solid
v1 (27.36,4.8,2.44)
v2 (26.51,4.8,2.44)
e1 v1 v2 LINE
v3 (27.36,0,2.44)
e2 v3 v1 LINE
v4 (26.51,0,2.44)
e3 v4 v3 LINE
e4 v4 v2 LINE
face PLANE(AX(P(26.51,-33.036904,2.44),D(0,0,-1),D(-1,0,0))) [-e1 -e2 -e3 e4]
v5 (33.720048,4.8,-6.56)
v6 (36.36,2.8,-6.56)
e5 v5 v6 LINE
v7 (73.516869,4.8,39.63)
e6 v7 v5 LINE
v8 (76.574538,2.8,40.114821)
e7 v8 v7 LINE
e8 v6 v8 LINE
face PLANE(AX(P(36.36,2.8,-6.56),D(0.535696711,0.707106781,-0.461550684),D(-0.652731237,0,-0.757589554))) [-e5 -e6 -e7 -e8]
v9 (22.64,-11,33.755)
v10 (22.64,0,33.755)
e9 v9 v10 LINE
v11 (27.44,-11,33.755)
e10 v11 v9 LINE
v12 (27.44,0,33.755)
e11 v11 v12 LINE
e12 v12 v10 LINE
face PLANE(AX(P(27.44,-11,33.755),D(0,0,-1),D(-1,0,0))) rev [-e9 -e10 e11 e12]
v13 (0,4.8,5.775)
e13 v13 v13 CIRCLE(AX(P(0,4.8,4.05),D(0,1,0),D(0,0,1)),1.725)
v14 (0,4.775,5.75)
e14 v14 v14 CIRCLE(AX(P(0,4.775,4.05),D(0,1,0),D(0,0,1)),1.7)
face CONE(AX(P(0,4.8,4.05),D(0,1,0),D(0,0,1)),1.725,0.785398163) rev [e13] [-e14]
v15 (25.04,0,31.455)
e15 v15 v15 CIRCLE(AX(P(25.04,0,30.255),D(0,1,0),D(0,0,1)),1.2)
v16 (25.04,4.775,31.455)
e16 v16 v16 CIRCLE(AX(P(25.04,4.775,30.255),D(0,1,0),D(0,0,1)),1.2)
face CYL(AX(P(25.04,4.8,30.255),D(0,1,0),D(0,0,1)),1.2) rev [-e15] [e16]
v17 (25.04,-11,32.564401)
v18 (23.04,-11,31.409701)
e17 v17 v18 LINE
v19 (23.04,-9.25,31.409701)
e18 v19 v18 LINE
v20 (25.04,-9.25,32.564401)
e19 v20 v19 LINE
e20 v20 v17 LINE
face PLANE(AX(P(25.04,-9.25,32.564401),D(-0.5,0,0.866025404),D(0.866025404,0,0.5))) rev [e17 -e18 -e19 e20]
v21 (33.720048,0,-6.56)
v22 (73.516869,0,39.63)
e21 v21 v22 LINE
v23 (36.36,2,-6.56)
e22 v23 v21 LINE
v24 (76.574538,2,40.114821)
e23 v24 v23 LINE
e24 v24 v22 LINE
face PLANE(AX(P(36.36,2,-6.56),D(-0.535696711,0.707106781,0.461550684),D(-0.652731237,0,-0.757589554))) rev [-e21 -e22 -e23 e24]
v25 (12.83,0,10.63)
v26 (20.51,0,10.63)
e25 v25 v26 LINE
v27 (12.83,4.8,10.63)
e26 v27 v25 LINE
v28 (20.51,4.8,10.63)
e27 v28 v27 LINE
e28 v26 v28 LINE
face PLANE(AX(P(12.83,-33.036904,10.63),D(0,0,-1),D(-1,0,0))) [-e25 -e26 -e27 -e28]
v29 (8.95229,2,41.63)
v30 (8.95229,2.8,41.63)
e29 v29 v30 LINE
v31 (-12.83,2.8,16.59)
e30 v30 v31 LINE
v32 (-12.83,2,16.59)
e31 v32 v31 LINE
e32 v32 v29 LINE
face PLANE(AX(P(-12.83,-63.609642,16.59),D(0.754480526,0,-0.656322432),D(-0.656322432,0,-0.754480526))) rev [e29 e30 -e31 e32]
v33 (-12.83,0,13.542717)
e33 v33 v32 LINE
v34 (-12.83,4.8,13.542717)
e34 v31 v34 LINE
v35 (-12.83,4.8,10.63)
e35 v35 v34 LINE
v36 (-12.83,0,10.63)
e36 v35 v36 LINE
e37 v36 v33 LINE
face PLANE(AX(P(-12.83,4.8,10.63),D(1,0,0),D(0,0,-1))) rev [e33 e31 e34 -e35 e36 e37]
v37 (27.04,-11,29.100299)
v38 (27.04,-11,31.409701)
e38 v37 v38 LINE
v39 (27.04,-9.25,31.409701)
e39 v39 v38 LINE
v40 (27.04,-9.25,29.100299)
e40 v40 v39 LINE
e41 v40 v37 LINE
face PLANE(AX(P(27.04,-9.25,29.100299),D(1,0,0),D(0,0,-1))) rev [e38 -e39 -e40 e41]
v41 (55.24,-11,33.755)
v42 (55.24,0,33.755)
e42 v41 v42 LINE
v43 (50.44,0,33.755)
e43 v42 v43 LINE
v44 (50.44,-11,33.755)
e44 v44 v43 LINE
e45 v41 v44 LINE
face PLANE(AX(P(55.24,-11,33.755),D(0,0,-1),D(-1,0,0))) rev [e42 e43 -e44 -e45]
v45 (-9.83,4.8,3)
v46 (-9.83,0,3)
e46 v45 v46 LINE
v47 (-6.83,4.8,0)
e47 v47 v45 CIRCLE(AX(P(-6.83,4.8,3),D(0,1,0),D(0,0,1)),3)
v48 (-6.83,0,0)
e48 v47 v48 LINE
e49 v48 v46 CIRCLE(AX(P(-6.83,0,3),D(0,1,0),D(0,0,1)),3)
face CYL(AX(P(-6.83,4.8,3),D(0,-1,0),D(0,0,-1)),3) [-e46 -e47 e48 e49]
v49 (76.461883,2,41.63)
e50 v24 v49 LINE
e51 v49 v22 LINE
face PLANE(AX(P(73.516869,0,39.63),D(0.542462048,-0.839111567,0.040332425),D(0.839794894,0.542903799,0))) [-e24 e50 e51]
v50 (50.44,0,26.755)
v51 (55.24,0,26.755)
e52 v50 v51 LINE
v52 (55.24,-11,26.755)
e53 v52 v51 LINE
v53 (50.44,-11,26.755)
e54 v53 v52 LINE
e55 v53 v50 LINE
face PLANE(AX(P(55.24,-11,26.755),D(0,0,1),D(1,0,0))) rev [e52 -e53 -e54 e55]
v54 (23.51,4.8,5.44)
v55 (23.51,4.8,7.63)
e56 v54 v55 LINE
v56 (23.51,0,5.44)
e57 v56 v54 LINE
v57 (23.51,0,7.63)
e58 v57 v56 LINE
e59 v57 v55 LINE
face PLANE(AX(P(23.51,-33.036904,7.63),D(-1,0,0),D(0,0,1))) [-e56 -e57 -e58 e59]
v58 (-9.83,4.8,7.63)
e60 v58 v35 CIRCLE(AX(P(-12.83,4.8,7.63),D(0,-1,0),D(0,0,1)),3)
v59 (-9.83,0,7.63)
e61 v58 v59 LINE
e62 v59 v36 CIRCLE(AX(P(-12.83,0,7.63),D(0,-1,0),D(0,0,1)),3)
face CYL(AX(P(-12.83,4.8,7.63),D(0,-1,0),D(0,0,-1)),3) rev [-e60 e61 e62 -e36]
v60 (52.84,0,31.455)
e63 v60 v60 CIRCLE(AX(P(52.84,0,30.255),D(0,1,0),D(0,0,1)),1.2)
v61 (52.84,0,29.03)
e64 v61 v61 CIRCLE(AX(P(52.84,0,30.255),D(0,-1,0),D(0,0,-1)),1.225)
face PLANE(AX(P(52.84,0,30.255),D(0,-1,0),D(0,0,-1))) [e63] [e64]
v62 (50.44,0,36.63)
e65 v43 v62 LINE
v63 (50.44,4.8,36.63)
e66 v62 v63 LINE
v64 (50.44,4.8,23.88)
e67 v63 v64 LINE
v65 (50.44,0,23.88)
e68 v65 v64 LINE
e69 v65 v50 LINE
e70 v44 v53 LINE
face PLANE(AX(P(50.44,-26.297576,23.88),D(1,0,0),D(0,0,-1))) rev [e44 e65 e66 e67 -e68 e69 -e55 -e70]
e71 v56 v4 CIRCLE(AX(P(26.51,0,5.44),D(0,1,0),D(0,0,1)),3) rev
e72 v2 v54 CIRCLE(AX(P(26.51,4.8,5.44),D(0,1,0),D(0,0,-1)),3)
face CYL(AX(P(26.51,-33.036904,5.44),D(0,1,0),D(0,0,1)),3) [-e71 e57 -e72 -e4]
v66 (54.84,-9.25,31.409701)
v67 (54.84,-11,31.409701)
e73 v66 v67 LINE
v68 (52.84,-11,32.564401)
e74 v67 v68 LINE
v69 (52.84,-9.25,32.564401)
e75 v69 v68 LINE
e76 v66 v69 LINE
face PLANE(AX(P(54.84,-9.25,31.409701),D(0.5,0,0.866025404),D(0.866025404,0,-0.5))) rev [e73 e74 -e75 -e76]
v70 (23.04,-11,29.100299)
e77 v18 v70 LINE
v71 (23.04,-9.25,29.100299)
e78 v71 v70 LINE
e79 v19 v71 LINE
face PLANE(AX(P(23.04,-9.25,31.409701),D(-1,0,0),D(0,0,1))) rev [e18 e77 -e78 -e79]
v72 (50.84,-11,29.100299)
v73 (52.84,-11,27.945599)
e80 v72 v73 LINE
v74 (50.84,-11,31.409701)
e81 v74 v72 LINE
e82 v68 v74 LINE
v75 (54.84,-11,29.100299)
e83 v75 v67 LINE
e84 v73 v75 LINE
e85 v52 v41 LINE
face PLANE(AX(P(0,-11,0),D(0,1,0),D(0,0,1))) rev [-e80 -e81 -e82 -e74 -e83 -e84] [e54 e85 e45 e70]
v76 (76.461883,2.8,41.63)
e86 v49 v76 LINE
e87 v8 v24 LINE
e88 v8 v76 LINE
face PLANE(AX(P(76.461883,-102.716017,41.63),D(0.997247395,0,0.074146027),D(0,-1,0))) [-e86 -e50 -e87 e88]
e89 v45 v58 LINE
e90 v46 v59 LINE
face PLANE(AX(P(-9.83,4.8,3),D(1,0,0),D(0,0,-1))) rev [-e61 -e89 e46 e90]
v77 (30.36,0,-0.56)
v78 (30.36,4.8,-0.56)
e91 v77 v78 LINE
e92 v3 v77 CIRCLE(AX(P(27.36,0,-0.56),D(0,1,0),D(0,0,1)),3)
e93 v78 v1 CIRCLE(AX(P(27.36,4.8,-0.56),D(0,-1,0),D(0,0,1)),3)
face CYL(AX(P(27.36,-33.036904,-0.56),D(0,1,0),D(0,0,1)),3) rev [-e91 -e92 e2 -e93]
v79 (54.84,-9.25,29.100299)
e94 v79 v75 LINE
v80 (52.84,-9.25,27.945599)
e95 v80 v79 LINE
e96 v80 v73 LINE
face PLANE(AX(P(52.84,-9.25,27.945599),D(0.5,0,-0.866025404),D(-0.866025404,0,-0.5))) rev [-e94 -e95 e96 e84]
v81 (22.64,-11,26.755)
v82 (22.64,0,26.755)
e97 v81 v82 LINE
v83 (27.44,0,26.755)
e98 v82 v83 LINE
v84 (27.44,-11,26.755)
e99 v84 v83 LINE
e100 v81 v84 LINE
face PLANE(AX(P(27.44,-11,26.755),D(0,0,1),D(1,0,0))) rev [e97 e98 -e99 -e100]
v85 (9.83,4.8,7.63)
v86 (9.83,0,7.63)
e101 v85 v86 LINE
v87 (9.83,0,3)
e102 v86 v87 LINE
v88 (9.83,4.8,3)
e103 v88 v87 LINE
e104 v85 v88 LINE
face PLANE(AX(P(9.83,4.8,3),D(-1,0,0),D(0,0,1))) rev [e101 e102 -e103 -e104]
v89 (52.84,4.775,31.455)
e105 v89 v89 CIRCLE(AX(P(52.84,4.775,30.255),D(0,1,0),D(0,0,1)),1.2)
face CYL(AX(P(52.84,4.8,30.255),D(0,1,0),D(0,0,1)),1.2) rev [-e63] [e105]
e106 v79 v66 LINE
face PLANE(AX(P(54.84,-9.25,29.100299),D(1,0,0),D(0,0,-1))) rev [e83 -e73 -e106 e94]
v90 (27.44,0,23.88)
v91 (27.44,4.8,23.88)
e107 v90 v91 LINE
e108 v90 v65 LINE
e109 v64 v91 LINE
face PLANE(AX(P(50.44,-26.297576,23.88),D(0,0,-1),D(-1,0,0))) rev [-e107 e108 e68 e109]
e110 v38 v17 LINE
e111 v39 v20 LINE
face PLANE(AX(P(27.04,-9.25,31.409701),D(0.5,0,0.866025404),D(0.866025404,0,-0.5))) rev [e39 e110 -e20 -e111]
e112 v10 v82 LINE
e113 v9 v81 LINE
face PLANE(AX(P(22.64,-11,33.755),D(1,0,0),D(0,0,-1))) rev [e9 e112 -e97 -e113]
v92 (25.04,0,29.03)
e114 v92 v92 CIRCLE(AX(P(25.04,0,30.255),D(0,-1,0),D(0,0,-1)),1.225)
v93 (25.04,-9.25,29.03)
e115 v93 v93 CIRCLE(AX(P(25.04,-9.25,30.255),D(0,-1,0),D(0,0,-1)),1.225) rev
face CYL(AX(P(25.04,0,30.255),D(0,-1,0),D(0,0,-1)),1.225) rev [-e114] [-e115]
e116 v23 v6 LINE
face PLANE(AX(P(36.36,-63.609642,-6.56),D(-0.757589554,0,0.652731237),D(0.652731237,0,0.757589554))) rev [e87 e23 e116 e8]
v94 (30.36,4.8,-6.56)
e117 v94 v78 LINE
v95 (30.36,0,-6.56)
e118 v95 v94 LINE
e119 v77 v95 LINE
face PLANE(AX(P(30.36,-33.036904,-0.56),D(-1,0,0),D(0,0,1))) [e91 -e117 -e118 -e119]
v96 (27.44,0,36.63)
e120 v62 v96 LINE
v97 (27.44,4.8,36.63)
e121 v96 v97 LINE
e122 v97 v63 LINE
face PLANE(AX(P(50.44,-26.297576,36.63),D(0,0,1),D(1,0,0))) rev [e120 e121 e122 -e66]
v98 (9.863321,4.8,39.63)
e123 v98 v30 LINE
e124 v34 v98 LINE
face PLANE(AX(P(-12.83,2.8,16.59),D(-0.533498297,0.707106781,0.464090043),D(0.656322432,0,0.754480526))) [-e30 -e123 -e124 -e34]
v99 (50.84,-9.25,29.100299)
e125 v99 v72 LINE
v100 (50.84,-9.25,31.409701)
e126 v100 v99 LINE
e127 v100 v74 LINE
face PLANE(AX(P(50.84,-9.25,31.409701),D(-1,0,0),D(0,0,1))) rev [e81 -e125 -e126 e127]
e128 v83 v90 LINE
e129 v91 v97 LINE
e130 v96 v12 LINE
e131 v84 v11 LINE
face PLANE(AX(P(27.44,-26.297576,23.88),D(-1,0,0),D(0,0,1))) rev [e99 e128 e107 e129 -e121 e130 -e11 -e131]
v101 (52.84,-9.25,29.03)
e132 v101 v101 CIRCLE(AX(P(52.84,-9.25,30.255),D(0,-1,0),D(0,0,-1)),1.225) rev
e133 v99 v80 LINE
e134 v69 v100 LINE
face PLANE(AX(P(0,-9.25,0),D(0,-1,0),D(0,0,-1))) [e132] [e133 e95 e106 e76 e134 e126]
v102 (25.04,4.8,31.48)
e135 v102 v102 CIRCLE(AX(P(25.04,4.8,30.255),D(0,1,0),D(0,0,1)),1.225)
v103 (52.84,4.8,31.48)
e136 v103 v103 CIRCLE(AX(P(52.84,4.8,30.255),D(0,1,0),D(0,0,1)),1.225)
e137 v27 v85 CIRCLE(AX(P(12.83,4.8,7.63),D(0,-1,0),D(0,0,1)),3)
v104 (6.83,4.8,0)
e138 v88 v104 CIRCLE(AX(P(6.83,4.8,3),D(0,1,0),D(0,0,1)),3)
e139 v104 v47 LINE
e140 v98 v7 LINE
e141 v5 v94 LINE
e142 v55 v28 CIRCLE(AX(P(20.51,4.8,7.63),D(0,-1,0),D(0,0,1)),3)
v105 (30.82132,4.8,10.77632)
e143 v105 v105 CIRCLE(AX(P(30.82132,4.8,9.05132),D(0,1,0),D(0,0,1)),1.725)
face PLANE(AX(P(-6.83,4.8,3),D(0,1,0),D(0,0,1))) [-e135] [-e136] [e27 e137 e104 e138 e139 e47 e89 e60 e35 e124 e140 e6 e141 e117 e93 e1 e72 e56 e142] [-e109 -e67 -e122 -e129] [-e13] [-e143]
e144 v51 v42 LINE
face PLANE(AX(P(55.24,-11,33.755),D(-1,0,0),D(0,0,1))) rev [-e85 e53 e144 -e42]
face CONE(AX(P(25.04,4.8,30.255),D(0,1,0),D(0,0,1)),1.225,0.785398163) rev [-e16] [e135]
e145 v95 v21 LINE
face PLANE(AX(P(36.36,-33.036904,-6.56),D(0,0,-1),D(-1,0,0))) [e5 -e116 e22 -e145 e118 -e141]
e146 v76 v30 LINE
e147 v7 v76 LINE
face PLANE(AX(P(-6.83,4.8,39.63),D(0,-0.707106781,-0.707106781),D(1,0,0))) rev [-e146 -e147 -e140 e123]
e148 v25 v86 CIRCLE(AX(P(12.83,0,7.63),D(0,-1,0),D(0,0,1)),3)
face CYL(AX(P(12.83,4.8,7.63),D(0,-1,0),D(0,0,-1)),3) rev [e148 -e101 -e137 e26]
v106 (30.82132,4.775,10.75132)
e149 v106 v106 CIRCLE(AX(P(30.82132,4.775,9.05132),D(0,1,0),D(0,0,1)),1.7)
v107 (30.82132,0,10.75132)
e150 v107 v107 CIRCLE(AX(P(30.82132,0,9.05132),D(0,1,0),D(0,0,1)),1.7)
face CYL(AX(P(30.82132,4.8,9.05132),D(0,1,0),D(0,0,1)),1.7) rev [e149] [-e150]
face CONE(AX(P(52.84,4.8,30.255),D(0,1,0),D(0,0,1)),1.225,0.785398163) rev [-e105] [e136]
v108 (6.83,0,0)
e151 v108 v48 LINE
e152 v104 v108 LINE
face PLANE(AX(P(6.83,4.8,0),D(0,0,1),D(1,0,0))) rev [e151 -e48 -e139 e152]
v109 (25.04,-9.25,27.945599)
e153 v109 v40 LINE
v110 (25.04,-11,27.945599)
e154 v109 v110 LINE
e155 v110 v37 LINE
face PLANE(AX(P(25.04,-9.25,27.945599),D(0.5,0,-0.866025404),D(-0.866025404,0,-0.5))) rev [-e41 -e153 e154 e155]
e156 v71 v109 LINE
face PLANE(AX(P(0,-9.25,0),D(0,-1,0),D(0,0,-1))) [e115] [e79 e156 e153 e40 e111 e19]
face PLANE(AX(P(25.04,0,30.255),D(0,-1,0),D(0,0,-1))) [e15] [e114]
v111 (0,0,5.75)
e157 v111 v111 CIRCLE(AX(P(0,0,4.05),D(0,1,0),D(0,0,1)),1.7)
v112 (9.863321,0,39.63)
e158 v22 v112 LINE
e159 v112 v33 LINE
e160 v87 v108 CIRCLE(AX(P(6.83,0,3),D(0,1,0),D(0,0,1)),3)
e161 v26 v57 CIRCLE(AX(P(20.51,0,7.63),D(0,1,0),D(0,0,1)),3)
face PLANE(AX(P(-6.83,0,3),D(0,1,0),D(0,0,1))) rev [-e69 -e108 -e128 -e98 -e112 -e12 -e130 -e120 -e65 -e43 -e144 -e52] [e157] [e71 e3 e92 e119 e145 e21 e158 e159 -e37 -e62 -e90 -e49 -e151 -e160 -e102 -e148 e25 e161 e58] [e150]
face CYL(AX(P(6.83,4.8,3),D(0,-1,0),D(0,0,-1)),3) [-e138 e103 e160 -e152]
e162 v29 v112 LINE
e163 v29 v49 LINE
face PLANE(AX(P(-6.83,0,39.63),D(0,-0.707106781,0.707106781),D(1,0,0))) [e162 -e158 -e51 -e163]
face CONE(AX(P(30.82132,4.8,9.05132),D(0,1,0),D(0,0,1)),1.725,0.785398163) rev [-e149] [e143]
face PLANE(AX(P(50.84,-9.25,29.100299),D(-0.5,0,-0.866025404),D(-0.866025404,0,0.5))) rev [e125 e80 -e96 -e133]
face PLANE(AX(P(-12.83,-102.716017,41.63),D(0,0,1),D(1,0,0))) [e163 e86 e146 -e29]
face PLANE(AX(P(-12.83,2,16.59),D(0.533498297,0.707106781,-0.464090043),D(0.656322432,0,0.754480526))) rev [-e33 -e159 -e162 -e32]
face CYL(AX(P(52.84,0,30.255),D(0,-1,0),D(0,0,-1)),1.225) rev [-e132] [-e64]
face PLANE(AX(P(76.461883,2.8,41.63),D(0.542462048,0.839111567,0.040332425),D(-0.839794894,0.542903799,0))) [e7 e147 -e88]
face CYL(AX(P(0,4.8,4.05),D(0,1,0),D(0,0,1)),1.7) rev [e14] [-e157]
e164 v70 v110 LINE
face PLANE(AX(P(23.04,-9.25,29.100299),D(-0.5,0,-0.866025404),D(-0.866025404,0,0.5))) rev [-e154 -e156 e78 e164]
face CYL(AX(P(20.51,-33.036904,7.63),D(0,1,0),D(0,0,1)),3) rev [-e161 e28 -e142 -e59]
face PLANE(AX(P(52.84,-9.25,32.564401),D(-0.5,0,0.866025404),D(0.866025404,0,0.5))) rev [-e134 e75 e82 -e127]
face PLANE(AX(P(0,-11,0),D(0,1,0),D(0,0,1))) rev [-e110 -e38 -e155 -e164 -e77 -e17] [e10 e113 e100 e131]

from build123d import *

# Parameters (mm, degrees)
BOSS_EXTRUDE1_DEPTH            = 4.8
BOSS_EXTRUDE3_DEPTH            = 4.8
M3_CLEARANCE_HOLE2_D           = 3.4
M3_CLEARANCE_HOLE2_CSINK_D     = 3.45
M3_CLEARANCE_HOLE2_CSINK_ANGLE = 90
BOSS_EXTRUDE4_DEPTH            = 4.8
SKETCH11_W                     = 23
SKETCH11_H                     = 12.75
CUT_EXTRUDE1_DEPTH             = 4.8
M2_CLEARANCE_HOLE1_D           = 2.4
M2_CLEARANCE_HOLE1_CSINK_D     = 2.45
M2_CLEARANCE_HOLE1_CSINK_ANGLE = 90
CUT_EXTRUDE2_DEPTH             = 4.8
SKETCH16_W                     = 4.8
SKETCH16_H                     = 7
BOSS_EXTRUDE6_DEPTH            = 11
SKETCH17_R                     = 1.225
CUT_EXTRUDE3_DEPTH             = 11
CUT_EXTRUDE4_DEPTH             = 1.75


with BuildPart() as part:
    # Sketch1 → Boss-Extrude1 (new body)
    with BuildSketch(Plane(origin=(0, 0, 0), x_dir=(1, 0, 0), z_dir=(0, 1, 0))):
        with BuildLine():
            Line((6.83, 0), (-6.83, 0))
            ThreePointArc((-6.83, 0), (-8.951320344, -0.878679656), (-9.83, -3))
            Line((-9.83, -3), (-9.83, -7.63))
            ThreePointArc((-9.83, -7.63), (-10.708679656, -9.751320344), (-12.83, -10.63))
            Line((-12.83, -10.63), (-12.83, -16.63))
            Line((-12.83, -16.63), (12.83, -16.63))
            Line((12.83, -16.63), (12.83, -10.63))
            ThreePointArc((12.83, -10.63), (10.708679656, -9.751320344), (9.83, -7.63))
            Line((9.83, -7.63), (9.83, -3))
            ThreePointArc((9.83, -3), (8.951320344, -0.878679656), (6.83, 0))
        make_face()
    extrude(amount=BOSS_EXTRUDE1_DEPTH)

    # Sketch9 → Boss-Extrude3 (add)
    with BuildSketch(Plane(origin=(0, 4.8, 0), x_dir=(1, 0, 0), z_dir=(0, 1, 0))):
        with BuildLine():
            Line((12.83, -16.63), (12.83, -10.63))
            Line((12.83, -10.63), (20.51, -10.63))
            ThreePointArc((20.51, -10.63), (22.631320344, -9.751320344), (23.51, -7.63))
            Line((23.51, -7.63), (23.51, -5.44))
            ThreePointArc((23.51, -5.44), (24.388679656, -3.318679656), (26.51, -2.44))
            Line((26.51, -2.44), (27.36, -2.44))
            ThreePointArc((27.36, -2.44), (29.481320344, -1.561320344), (30.36, 0.56))
            Line((30.36, 0.56), (30.36, 6.56))
            Line((30.36, 6.56), (36.36, 6.56))
            Line((36.36, 6.56), (36.36, -16.63))
            Line((36.36, -16.63), (12.83, -16.63))
        make_face()
    extrude(amount=-BOSS_EXTRUDE3_DEPTH)

    # M3 Clearance Hole2 (through all)
    with Locations(Plane(origin=(0, 4.8, 0), x_dir=(1, 0, 0), z_dir=(0, 1, 0))):
        with Locations((0, -4.05), (30.821320344, -9.051320344)):
            CounterSinkHole(M3_CLEARANCE_HOLE2_D / 2, M3_CLEARANCE_HOLE2_CSINK_D / 2, counter_sink_angle=M3_CLEARANCE_HOLE2_CSINK_ANGLE)

    # Sketch10 → Boss-Extrude4 (add)
    with BuildSketch(Plane(origin=(0, 4.8, 0), x_dir=(1, 0, 0), z_dir=(0, 1, 0))):
        Polygon((-12.83, -16.63), (-12.83, -41.63), (77.88, -41.63), (77.88, 6.56), (36.36, 6.56), (36.36, -16.63), align=None)
    extrude(amount=-BOSS_EXTRUDE4_DEPTH)

    # Sketch11 → Cut-Extrude1 (cut)
    with BuildSketch(Plane(origin=(0, 4.8, 0), x_dir=(1, 0, 0), z_dir=(0, 1, 0))):
        with Locations((38.94, -30.255)):
            Rectangle(SKETCH11_W, SKETCH11_H)
    extrude(amount=-CUT_EXTRUDE1_DEPTH, mode=Mode.SUBTRACT)

    # M2 Clearance Hole1 (through all)
    with Locations(Plane(origin=(0, 4.8, 0), x_dir=(1, 0, 0), z_dir=(0, 1, 0))):
        with Locations((25.04, -30.255), (52.84, -30.255)):
            CounterSinkHole(M2_CLEARANCE_HOLE1_D / 2, M2_CLEARANCE_HOLE1_CSINK_D / 2, counter_sink_angle=M2_CLEARANCE_HOLE1_CSINK_ANGLE)

    # Sketch14 → Cut-Extrude2 (cut)
    with BuildSketch(Plane(origin=(0, 4.8, 0), x_dir=(1, 0, 0), z_dir=(0, 1, 0))):
        Polygon((-12.83, -16.59), (8.952290106, -41.63), (-12.83, -41.63), align=None)
        Polygon((36.36, 6.56), (77.88, -41.63), (77.88, 6.56), align=None)
    extrude(amount=-CUT_EXTRUDE2_DEPTH, mode=Mode.SUBTRACT)

    # Chamfer2
    # the kernel refuses this chamfer: 2, 1.418117079 mm, written as the material it takes off along each edge
    with BuildSketch(Plane(origin=(75.517763148, 3.466666667, 40.45827363), x_dir=(-0.07414602746519786, 0, 0.9972473948881141), z_dir=(0.5424620475376688, 0.83911156735298, 0.040332425115101794))) as chamfer2_piece_1:
        Polygon((-0.420862971, 1.22558177), (1.098498339, 1.22558177), (-0.677635367, -2.451163541), align=None)
    extrude(amount=2.692247612, mode=Mode.SUBTRACT)
    with BuildSketch(Plane(origin=(75.517763148, 1.333333333, 40.45827363), x_dir=(-0.07414602746519786, 0, 0.9972473948881141), z_dir=(0.5424620475376688, -0.83911156735298, 0.040332425115102044))) as chamfer2_piece_2:
        Polygon((-0.420862971, -1.22558177), (1.098498339, -1.22558177), (-0.677635367, 2.451163541), align=None)
    extrude(amount=2.692247612, mode=Mode.SUBTRACT)
    with BuildSketch(Plane(origin=(3.80892413, 4.8, 41.63), x_dir=(0, 0.02749587661058651, -0.9996219169112968), z_dir=(1, 0, 0))) as chamfer2_piece_3:
        with BuildLine():
            Line((2.05734639, 0), (-0.11309431, -2.054235587))
            Line((-0.11309431, -2.054235587), (-0.153079186, -2.053135752))
            ThreePointArc((-0.153079186, -2.053135752), (-0.068258454, -1.026795659), (-0.039984877, 0.001099835))
            Line((-0.039984877, 0.001099835), (0.001099835, 0.039984877))
            ThreePointArc((0.001099835, 0.039984877), (1.028995329, 0.011711299), (2.058446225, 0.039984877))
            Line((2.058446225, 0.039984877), (2.05734639, 0))
        make_face()
    extrude(amount=79.214441846, mode=Mode.SUBTRACT)
    with BuildSketch(Plane(origin=(-16.205706468, 4.8, 12.709430531), x_dir=(0.7541952701172161, 0.027495876610586487, -0.6560742879447683), z_dir=(0.6563224323571792, 0, 0.754480526445021))) as chamfer2_piece_4:
        with BuildLine():
            Line((2.05734639, 0), (-0.11309431, -2.054235587))
            Line((-0.11309431, -2.054235587), (-0.153079186, -2.053135752))
            ThreePointArc((-0.153079186, -2.053135752), (-0.068258454, -1.026795659), (-0.039984877, 0.001099835))
            Line((-0.039984877, 0.001099835), (0.001099835, 0.039984877))
            ThreePointArc((0.001099835, 0.039984877), (1.028995329, 0.011711299), (2.058446225, 0.039984877))
            Line((2.058446225, 0.039984877), (2.05734639, 0))
        make_face()
    extrude(amount=43.475129959, mode=Mode.SUBTRACT)
    with BuildSketch(Plane(origin=(-16.205706468, 0, 12.709430531), x_dir=(0.7541952701172161, -0.02749587661058636, -0.6560742879447683), z_dir=(0.6563224323571792, 0, 0.754480526445021))) as chamfer2_piece_5:
        with BuildLine():
            Line((2.05734639, 0), (-0.11309431, 2.054235587))
            Line((-0.11309431, 2.054235587), (-0.153079186, 2.053135752))
            ThreePointArc((-0.153079186, 2.053135752), (-0.068258454, 1.026795659), (-0.039984877, -0.001099835))
            Line((-0.039984877, -0.001099835), (0.001099835, -0.039984877))
            ThreePointArc((0.001099835, -0.039984877), (1.028995329, -0.011711299), (2.058446225, -0.039984877))
            Line((2.058446225, -0.039984877), (2.05734639, 0))
        make_face()
    extrude(amount=43.475129959, mode=Mode.SUBTRACT)
    with BuildSketch(Plane(origin=(33.002764366, 4.8, -10.456560337), x_dir=(-0.7573031224660502, 0.027495876610586473, 0.6524844499852744), z_dir=(0.6527312366273116, 0, 0.757589554264696))) as chamfer2_piece_6:
        with BuildLine():
            Line((2.05734639, 0), (-0.11309431, 2.054235587))
            Line((-0.11309431, 2.054235587), (-0.153079186, 2.053135752))
            ThreePointArc((-0.153079186, 2.053135752), (-0.068258454, 1.026795659), (-0.039984877, -0.001099835))
            Line((-0.039984877, -0.001099835), (0.001099835, -0.039984877))
            ThreePointArc((0.001099835, -0.039984877), (1.028995329, -0.011711299), (2.058446225, -0.039984877))
            Line((2.058446225, -0.039984877), (2.05734639, 0))
        make_face()
    extrude(amount=73.896373517, mode=Mode.SUBTRACT)
    with BuildSketch(Plane(origin=(33.002764366, 0, -10.456560337), x_dir=(-0.7573031224660502, -0.02749587661058634, 0.6524844499852744), z_dir=(0.6527312366273116, 0, 0.757589554264696))) as chamfer2_piece_7:
        with BuildLine():
            Line((2.05734639, 0), (-0.11309431, -2.054235587))
            Line((-0.11309431, -2.054235587), (-0.153079186, -2.053135752))
            ThreePointArc((-0.153079186, -2.053135752), (-0.068258454, -1.026795659), (-0.039984877, 0.001099835))
            Line((-0.039984877, 0.001099835), (0.001099835, 0.039984877))
            ThreePointArc((0.001099835, 0.039984877), (1.028995329, 0.011711299), (2.058446225, 0.039984877))
            Line((2.058446225, 0.039984877), (2.05734639, 0))
        make_face()
    extrude(amount=73.896373517, mode=Mode.SUBTRACT)
    with BuildSketch(Plane(origin=(77.88, 9.943365976, 41.63), x_dir=(-0.6316538610797438, 0, -0.7752505400082296), z_dir=(0, -1, 0))) as chamfer2_piece_8:
        with BuildLine():
            Line((2.05734639, 0), (0.837656572, -1.154387784))
            Line((0.837656572, -1.154387784), (0.80664655, -1.179653939))
            ThreePointArc((0.80664655, -1.179653939), (0.418742927, -0.57726344), (-0.031010022, -0.025266154))
            Line((-0.031010022, -0.025266154), (0.001099835, 0.039984877))
            ThreePointArc((0.001099835, 0.039984877), (1.028995329, 0.011711299), (2.058446225, 0.039984877))
            Line((2.058446225, 0.039984877), (2.05734639, 0))
        make_face()
    extrude(amount=15.086731952, mode=Mode.SUBTRACT)
    with BuildSketch(Plane(origin=(3.80892413, 0, 41.63), x_dir=(0, -0.02749587661058639, -0.9996219169112968), z_dir=(1, 0, 0))) as chamfer2_piece_9:
        with BuildLine():
            Line((2.05734639, 0), (-0.11309431, 2.054235587))
            Line((-0.11309431, 2.054235587), (-0.153079186, 2.053135752))
            ThreePointArc((-0.153079186, 2.053135752), (-0.068258454, 1.026795659), (-0.039984877, -0.001099835))
            Line((-0.039984877, -0.001099835), (0.001099835, -0.039984877))
            ThreePointArc((0.001099835, -0.039984877), (1.028995329, -0.011711299), (2.058446225, -0.039984877))
            Line((2.058446225, -0.039984877), (2.05734639, 0))
        make_face()
    extrude(amount=79.214441846, mode=Mode.SUBTRACT)

    # Sketch16 → Boss-Extrude6 (add)
    with BuildSketch(Plane.XZ):
        with Locations((25.04, 30.255)):
            Rectangle(SKETCH16_W, SKETCH16_H)
        with Locations((52.84, 30.255)):
            Rectangle(SKETCH16_W, SKETCH16_H)
    extrude(amount=BOSS_EXTRUDE6_DEPTH)

    # Sketch17 → Cut-Extrude3 (cut)
    with BuildSketch(Plane.XZ.offset(11)):
        with Locations(Location((25.04, 30.255, 0), (0, 0, 270))):
            Circle(SKETCH17_R)
        with Locations(Location((52.84, 30.255, 0), (0, 0, 270))):
            Circle(SKETCH17_R)
    extrude(amount=-CUT_EXTRUDE3_DEPTH, mode=Mode.SUBTRACT)

    # Sketch18 → Cut-Extrude4 (cut)
    with BuildSketch(Plane.XZ.offset(11)):
        Polygon((25.04, 27.945598923), (27.04, 29.100299462), (27.04, 31.409700538), (25.04, 32.564401077), (23.04, 31.409700538), (23.04, 29.100299462), align=None)
        Polygon((52.84, 27.945598923), (54.84, 29.100299462), (54.84, 31.409700538), (52.84, 32.564401077), (50.84, 31.409700538), (50.84, 29.100299462), align=None)
    extrude(amount=-CUT_EXTRUDE4_DEPTH, mode=Mode.SUBTRACT)


solid = part.part
